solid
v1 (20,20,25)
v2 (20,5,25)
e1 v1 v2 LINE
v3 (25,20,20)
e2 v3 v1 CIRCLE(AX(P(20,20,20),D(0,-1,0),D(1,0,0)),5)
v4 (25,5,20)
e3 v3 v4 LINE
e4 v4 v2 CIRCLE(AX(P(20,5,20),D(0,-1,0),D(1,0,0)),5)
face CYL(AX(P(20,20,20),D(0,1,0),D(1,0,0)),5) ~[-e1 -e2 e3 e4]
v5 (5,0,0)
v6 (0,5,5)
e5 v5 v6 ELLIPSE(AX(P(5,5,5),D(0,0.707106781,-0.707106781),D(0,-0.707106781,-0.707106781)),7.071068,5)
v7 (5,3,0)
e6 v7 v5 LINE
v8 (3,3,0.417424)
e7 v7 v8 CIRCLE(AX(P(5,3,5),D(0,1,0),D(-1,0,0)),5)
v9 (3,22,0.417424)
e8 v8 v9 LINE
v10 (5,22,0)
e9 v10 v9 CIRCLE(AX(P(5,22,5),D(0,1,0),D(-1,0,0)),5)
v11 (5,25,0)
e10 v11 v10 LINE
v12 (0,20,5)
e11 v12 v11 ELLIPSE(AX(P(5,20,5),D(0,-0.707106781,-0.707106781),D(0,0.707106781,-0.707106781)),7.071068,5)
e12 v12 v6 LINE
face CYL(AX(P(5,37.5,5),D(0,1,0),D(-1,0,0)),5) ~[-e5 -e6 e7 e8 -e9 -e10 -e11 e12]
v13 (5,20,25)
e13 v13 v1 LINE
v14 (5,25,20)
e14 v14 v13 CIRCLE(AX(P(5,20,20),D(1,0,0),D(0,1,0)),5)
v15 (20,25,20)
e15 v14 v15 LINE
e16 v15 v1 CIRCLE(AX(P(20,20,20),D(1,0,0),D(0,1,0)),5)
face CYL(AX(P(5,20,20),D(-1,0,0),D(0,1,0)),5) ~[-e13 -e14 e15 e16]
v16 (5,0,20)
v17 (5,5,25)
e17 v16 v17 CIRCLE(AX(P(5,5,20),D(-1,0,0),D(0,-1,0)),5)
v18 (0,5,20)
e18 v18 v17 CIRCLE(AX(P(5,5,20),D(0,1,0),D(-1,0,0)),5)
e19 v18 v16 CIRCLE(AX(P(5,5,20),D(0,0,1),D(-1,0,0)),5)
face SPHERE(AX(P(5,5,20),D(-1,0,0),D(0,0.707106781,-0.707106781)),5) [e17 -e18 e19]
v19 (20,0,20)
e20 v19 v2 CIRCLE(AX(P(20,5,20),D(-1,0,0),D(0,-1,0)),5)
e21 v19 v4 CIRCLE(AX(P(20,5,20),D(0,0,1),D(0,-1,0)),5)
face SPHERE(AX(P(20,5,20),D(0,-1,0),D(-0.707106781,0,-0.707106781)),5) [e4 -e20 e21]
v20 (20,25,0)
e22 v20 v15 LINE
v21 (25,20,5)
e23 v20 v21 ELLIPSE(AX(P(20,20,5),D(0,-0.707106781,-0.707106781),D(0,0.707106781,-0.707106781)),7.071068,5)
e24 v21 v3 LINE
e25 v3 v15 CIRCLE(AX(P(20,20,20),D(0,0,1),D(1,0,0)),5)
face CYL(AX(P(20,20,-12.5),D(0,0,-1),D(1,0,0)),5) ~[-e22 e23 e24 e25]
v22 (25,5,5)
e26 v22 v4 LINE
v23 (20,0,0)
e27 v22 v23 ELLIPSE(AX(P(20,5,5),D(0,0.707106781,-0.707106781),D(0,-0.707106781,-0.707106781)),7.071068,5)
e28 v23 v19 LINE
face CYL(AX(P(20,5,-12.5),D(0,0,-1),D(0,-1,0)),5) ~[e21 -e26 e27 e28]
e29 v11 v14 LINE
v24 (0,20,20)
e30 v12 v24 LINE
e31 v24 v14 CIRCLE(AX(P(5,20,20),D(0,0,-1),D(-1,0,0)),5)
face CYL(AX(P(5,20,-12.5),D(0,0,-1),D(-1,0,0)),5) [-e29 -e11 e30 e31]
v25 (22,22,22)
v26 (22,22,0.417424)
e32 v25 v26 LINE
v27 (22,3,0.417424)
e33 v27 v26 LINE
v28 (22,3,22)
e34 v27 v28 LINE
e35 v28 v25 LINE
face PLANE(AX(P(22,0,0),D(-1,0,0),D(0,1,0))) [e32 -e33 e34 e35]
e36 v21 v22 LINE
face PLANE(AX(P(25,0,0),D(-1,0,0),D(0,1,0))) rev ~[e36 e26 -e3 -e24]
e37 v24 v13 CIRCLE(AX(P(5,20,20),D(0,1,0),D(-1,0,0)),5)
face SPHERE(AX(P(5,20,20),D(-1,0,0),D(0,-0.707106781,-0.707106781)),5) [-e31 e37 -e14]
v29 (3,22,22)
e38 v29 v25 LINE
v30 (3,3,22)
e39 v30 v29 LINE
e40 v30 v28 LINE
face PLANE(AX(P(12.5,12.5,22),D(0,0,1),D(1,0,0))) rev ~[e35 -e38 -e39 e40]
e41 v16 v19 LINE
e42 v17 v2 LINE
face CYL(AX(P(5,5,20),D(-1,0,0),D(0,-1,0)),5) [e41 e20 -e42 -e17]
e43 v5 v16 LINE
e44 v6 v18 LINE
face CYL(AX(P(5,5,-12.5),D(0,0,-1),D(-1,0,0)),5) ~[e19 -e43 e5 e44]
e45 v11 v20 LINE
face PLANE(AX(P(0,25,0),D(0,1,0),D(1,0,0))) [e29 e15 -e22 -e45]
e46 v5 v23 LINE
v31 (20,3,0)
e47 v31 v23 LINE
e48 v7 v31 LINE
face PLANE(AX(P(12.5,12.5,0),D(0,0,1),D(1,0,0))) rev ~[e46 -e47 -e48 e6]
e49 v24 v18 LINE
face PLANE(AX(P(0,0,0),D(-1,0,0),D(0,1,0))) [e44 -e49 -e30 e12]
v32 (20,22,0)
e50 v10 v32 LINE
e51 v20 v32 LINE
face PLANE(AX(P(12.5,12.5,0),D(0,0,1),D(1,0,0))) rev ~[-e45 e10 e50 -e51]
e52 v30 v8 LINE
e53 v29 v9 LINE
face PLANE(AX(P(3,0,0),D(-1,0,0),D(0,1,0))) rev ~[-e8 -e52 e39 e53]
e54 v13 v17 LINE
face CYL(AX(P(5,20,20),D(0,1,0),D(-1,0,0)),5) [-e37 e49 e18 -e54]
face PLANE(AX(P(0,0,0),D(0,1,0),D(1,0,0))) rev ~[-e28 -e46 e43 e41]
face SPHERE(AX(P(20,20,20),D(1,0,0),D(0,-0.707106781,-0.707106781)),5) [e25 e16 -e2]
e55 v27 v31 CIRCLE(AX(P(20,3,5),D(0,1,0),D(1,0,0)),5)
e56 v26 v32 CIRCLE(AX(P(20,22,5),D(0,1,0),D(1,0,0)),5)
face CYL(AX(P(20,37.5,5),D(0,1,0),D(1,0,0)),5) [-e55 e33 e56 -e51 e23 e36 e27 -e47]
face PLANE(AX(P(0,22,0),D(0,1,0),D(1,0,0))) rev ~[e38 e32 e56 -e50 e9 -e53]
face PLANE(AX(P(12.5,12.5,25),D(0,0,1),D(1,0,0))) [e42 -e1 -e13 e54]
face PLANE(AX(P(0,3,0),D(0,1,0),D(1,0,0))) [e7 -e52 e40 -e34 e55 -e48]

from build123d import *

# Parameters (mm, degrees)
F0_W         = 25
F0_H         = 25
F1_DEPTH     = 25
F2_T         = -3
F3_T1_DEPTH  = 32.5
F3_T3_DEPTH  = 50
F3_T5_DEPTH  = 15
F3_T7_DEPTH  = 15
F3_S11_W     = 5
F3_S11_H     = 5
F3_T12_DEPTH = 5
F3_S17_W     = 5
F3_S17_H     = 5
F3_T18_DEPTH = 5
F3_S23_W     = 5
F3_S23_H     = 5
F3_T24_DEPTH = 5
F3_S29_W     = 5
F3_S29_H     = 5
F3_T30_DEPTH = 5


# Not quite as in the source:
# - a fillet or chamfer that OpenCascade refuses, or shapes differently, is made with other operations: its cross-section is extruded or revolved along the edge and cut away or added


with BuildPart() as f1:
    # F0 (on Top) → F1 (new body)
    with BuildSketch(Plane.XY):
        with Locations((12.5, 12.5)):
            Rectangle(F0_W, F0_H)
    extrude(amount=F1_DEPTH)

    # F2
    f2_openings = [f1.faces().sort_by_distance(p)[0] for p in [
        (12.5, 12.5, 0),
    ]]
    offset(amount=F2_T, openings=f2_openings)

    # F3: fillet of radius 5 on 10 edges, made by hand

    # F3_s2 → F3_t1 (cut)
    with BuildSketch(Plane.XY.offset(-12.5)):
        with BuildLine():
            ThreePointArc((25, 20), (23.5355339059, 23.5355339059), (20, 25))
            Line((20, 25), (25, 25))
            Line((25, 25), (25, 20))
        make_face()
        with BuildLine():
            ThreePointArc((20, 0), (23.5355339059, 1.4644660941), (25, 5))
            Line((25, 5), (25, 0))
            Line((25, 0), (20, 0))
        make_face()
        with BuildLine():
            ThreePointArc((0, 20), (1.4644660941, 23.5355339059), (5, 25))
            Line((5, 25), (0, 25))
            Line((0, 25), (0, 20))
        make_face()
        with BuildLine():
            ThreePointArc((0, 5), (1.4644660941, 1.4644660941), (5, 0))
            Line((5, 0), (0, 0))
            Line((0, 0), (0, 5))
        make_face()
    extrude(amount=F3_T1_DEPTH, mode=Mode.SUBTRACT)

    # F3_s4 → F3_t3 (cut)
    with BuildSketch(Plane.XZ.offset(-37.5)):
        with BuildLine():
            ThreePointArc((25, 5), (23.5355339059, 1.4644660941), (20, 0))
            Line((20, 0), (25, 0))
            Line((25, 0), (25, 5))
        make_face()
        with BuildLine():
            ThreePointArc((0, 5), (1.4644660941, 1.4644660941), (5, 0))
            Line((5, 0), (0, 0))
            Line((0, 0), (0, 5))
        make_face()
    extrude(amount=F3_T3_DEPTH, mode=Mode.SUBTRACT)

    # F3_s6 → F3_t5 (cut)
    with BuildSketch(Plane.XZ.offset(-20)):
        with BuildLine():
            ThreePointArc((25, 20), (23.5355339059, 23.5355339059), (20, 25))
            Line((20, 25), (25, 25))
            Line((25, 25), (25, 20))
        make_face()
        with BuildLine():
            ThreePointArc((0, 20), (1.4644660941, 23.5355339059), (5, 25))
            Line((5, 25), (0, 25))
            Line((0, 25), (0, 20))
        make_face()
    extrude(amount=F3_T5_DEPTH, mode=Mode.SUBTRACT)

    # F3_s8 → F3_t7 (cut)
    with BuildSketch(Plane.YZ.offset(5)):
        with BuildLine():
            ThreePointArc((0, 20), (1.4644660941, 23.5355339059), (5, 25))
            Line((5, 25), (0, 25))
            Line((0, 25), (0, 20))
        make_face()
        with BuildLine():
            ThreePointArc((25, 20), (23.5355339059, 23.5355339059), (20, 25))
            Line((20, 25), (25, 25))
            Line((25, 25), (25, 20))
        make_face()
    extrude(amount=F3_T7_DEPTH, mode=Mode.SUBTRACT)


with BuildPart() as f3_tool10:
    # F3_s11 → F3_t12 (new body)
    with BuildSketch(Plane.YZ.offset(20)):
        with Locations((22.5, 22.5)):
            Rectangle(F3_S11_W, F3_S11_H)
    extrude(amount=F3_T12_DEPTH)

    # F3_s13 → F3_t14 (revolve, cut)
    with BuildSketch(Plane(origin=(20, 20, 20), x_dir=(0, -0.7071067812, -0.7071067812), z_dir=(0, -0.7071067812, 0.7071067812))):
        with BuildLine():
            ThreePointArc((0, -5), (5, 0), (0, 5))
            Line((0, 5), (0, -5))
        make_face()
    revolve(axis=Axis((20, 20, 20), (1, 0, 0)), mode=Mode.SUBTRACT)


with BuildPart() as f1_1:
    add(f1.part)

    # F3_t9: cut F3_tool10
    add(f3_tool10.part, mode=Mode.SUBTRACT)


with BuildPart() as f3_tool16:
    # F3_s17 → F3_t18 (new body)
    with BuildSketch(Plane.XZ.offset(-5)):
        with Locations((22.5, 22.5)):
            Rectangle(F3_S17_W, F3_S17_H)
    extrude(amount=F3_T18_DEPTH)

    # F3_s19 → F3_t20 (revolve, cut)
    with BuildSketch(Plane(origin=(20, 5, 20), x_dir=(-0.7071067812, 0, -0.7071067812), z_dir=(-0.7071067812, 0, 0.7071067812))):
        with BuildLine():
            ThreePointArc((0, -5), (5, 0), (0, 5))
            Line((0, 5), (0, -5))
        make_face()
    revolve(axis=Axis((20, 5, 20), (0, -1, 0)), mode=Mode.SUBTRACT)


with BuildPart() as f1_2:
    add(f1_1.part)

    # F3_t15: cut F3_tool16
    add(f3_tool16.part, mode=Mode.SUBTRACT)


with BuildPart() as f3_tool22:
    # F3_s23 → F3_t24 (new body)
    with BuildSketch(Plane.YZ.offset(5)):
        with Locations((22.5, 22.5)):
            Rectangle(F3_S23_W, F3_S23_H)
    extrude(amount=-F3_T24_DEPTH)

    # F3_s25 → F3_t26 (revolve, cut)
    with BuildSketch(Plane(origin=(5, 20, 20), x_dir=(0, -0.7071067812, -0.7071067812), z_dir=(0, 0.7071067812, -0.7071067812))):
        with BuildLine():
            ThreePointArc((0, -5), (5, 0), (0, 5))
            Line((0, 5), (0, -5))
        make_face()
    revolve(axis=Axis((5, 20, 20), (-1, 0, 0)), mode=Mode.SUBTRACT)


with BuildPart() as f1_3:
    add(f1_2.part)

    # F3_t21: cut F3_tool22
    add(f3_tool22.part, mode=Mode.SUBTRACT)


with BuildPart() as f3_tool28:
    # F3_s29 → F3_t30 (new body)
    with BuildSketch(Plane.YZ.offset(5)):
        with Locations((2.5, 22.5)):
            Rectangle(F3_S29_W, F3_S29_H)
    extrude(amount=-F3_T30_DEPTH)

    # F3_s31 → F3_t32 (revolve, cut)
    with BuildSketch(Plane(origin=(5, 5, 20), x_dir=(0, 0.7071067812, -0.7071067812), z_dir=(0, 0.7071067812, 0.7071067812))):
        with BuildLine():
            ThreePointArc((0, -5), (5, 0), (0, 5))
            Line((0, 5), (0, -5))
        make_face()
    revolve(axis=Axis((5, 5, 20), (-1, 0, 0)), mode=Mode.SUBTRACT)


with BuildPart() as f1_4:
    add(f1_3.part)

    # F3_t27: cut F3_tool28
    add(f3_tool28.part, mode=Mode.SUBTRACT)


solid = f1_4.part
